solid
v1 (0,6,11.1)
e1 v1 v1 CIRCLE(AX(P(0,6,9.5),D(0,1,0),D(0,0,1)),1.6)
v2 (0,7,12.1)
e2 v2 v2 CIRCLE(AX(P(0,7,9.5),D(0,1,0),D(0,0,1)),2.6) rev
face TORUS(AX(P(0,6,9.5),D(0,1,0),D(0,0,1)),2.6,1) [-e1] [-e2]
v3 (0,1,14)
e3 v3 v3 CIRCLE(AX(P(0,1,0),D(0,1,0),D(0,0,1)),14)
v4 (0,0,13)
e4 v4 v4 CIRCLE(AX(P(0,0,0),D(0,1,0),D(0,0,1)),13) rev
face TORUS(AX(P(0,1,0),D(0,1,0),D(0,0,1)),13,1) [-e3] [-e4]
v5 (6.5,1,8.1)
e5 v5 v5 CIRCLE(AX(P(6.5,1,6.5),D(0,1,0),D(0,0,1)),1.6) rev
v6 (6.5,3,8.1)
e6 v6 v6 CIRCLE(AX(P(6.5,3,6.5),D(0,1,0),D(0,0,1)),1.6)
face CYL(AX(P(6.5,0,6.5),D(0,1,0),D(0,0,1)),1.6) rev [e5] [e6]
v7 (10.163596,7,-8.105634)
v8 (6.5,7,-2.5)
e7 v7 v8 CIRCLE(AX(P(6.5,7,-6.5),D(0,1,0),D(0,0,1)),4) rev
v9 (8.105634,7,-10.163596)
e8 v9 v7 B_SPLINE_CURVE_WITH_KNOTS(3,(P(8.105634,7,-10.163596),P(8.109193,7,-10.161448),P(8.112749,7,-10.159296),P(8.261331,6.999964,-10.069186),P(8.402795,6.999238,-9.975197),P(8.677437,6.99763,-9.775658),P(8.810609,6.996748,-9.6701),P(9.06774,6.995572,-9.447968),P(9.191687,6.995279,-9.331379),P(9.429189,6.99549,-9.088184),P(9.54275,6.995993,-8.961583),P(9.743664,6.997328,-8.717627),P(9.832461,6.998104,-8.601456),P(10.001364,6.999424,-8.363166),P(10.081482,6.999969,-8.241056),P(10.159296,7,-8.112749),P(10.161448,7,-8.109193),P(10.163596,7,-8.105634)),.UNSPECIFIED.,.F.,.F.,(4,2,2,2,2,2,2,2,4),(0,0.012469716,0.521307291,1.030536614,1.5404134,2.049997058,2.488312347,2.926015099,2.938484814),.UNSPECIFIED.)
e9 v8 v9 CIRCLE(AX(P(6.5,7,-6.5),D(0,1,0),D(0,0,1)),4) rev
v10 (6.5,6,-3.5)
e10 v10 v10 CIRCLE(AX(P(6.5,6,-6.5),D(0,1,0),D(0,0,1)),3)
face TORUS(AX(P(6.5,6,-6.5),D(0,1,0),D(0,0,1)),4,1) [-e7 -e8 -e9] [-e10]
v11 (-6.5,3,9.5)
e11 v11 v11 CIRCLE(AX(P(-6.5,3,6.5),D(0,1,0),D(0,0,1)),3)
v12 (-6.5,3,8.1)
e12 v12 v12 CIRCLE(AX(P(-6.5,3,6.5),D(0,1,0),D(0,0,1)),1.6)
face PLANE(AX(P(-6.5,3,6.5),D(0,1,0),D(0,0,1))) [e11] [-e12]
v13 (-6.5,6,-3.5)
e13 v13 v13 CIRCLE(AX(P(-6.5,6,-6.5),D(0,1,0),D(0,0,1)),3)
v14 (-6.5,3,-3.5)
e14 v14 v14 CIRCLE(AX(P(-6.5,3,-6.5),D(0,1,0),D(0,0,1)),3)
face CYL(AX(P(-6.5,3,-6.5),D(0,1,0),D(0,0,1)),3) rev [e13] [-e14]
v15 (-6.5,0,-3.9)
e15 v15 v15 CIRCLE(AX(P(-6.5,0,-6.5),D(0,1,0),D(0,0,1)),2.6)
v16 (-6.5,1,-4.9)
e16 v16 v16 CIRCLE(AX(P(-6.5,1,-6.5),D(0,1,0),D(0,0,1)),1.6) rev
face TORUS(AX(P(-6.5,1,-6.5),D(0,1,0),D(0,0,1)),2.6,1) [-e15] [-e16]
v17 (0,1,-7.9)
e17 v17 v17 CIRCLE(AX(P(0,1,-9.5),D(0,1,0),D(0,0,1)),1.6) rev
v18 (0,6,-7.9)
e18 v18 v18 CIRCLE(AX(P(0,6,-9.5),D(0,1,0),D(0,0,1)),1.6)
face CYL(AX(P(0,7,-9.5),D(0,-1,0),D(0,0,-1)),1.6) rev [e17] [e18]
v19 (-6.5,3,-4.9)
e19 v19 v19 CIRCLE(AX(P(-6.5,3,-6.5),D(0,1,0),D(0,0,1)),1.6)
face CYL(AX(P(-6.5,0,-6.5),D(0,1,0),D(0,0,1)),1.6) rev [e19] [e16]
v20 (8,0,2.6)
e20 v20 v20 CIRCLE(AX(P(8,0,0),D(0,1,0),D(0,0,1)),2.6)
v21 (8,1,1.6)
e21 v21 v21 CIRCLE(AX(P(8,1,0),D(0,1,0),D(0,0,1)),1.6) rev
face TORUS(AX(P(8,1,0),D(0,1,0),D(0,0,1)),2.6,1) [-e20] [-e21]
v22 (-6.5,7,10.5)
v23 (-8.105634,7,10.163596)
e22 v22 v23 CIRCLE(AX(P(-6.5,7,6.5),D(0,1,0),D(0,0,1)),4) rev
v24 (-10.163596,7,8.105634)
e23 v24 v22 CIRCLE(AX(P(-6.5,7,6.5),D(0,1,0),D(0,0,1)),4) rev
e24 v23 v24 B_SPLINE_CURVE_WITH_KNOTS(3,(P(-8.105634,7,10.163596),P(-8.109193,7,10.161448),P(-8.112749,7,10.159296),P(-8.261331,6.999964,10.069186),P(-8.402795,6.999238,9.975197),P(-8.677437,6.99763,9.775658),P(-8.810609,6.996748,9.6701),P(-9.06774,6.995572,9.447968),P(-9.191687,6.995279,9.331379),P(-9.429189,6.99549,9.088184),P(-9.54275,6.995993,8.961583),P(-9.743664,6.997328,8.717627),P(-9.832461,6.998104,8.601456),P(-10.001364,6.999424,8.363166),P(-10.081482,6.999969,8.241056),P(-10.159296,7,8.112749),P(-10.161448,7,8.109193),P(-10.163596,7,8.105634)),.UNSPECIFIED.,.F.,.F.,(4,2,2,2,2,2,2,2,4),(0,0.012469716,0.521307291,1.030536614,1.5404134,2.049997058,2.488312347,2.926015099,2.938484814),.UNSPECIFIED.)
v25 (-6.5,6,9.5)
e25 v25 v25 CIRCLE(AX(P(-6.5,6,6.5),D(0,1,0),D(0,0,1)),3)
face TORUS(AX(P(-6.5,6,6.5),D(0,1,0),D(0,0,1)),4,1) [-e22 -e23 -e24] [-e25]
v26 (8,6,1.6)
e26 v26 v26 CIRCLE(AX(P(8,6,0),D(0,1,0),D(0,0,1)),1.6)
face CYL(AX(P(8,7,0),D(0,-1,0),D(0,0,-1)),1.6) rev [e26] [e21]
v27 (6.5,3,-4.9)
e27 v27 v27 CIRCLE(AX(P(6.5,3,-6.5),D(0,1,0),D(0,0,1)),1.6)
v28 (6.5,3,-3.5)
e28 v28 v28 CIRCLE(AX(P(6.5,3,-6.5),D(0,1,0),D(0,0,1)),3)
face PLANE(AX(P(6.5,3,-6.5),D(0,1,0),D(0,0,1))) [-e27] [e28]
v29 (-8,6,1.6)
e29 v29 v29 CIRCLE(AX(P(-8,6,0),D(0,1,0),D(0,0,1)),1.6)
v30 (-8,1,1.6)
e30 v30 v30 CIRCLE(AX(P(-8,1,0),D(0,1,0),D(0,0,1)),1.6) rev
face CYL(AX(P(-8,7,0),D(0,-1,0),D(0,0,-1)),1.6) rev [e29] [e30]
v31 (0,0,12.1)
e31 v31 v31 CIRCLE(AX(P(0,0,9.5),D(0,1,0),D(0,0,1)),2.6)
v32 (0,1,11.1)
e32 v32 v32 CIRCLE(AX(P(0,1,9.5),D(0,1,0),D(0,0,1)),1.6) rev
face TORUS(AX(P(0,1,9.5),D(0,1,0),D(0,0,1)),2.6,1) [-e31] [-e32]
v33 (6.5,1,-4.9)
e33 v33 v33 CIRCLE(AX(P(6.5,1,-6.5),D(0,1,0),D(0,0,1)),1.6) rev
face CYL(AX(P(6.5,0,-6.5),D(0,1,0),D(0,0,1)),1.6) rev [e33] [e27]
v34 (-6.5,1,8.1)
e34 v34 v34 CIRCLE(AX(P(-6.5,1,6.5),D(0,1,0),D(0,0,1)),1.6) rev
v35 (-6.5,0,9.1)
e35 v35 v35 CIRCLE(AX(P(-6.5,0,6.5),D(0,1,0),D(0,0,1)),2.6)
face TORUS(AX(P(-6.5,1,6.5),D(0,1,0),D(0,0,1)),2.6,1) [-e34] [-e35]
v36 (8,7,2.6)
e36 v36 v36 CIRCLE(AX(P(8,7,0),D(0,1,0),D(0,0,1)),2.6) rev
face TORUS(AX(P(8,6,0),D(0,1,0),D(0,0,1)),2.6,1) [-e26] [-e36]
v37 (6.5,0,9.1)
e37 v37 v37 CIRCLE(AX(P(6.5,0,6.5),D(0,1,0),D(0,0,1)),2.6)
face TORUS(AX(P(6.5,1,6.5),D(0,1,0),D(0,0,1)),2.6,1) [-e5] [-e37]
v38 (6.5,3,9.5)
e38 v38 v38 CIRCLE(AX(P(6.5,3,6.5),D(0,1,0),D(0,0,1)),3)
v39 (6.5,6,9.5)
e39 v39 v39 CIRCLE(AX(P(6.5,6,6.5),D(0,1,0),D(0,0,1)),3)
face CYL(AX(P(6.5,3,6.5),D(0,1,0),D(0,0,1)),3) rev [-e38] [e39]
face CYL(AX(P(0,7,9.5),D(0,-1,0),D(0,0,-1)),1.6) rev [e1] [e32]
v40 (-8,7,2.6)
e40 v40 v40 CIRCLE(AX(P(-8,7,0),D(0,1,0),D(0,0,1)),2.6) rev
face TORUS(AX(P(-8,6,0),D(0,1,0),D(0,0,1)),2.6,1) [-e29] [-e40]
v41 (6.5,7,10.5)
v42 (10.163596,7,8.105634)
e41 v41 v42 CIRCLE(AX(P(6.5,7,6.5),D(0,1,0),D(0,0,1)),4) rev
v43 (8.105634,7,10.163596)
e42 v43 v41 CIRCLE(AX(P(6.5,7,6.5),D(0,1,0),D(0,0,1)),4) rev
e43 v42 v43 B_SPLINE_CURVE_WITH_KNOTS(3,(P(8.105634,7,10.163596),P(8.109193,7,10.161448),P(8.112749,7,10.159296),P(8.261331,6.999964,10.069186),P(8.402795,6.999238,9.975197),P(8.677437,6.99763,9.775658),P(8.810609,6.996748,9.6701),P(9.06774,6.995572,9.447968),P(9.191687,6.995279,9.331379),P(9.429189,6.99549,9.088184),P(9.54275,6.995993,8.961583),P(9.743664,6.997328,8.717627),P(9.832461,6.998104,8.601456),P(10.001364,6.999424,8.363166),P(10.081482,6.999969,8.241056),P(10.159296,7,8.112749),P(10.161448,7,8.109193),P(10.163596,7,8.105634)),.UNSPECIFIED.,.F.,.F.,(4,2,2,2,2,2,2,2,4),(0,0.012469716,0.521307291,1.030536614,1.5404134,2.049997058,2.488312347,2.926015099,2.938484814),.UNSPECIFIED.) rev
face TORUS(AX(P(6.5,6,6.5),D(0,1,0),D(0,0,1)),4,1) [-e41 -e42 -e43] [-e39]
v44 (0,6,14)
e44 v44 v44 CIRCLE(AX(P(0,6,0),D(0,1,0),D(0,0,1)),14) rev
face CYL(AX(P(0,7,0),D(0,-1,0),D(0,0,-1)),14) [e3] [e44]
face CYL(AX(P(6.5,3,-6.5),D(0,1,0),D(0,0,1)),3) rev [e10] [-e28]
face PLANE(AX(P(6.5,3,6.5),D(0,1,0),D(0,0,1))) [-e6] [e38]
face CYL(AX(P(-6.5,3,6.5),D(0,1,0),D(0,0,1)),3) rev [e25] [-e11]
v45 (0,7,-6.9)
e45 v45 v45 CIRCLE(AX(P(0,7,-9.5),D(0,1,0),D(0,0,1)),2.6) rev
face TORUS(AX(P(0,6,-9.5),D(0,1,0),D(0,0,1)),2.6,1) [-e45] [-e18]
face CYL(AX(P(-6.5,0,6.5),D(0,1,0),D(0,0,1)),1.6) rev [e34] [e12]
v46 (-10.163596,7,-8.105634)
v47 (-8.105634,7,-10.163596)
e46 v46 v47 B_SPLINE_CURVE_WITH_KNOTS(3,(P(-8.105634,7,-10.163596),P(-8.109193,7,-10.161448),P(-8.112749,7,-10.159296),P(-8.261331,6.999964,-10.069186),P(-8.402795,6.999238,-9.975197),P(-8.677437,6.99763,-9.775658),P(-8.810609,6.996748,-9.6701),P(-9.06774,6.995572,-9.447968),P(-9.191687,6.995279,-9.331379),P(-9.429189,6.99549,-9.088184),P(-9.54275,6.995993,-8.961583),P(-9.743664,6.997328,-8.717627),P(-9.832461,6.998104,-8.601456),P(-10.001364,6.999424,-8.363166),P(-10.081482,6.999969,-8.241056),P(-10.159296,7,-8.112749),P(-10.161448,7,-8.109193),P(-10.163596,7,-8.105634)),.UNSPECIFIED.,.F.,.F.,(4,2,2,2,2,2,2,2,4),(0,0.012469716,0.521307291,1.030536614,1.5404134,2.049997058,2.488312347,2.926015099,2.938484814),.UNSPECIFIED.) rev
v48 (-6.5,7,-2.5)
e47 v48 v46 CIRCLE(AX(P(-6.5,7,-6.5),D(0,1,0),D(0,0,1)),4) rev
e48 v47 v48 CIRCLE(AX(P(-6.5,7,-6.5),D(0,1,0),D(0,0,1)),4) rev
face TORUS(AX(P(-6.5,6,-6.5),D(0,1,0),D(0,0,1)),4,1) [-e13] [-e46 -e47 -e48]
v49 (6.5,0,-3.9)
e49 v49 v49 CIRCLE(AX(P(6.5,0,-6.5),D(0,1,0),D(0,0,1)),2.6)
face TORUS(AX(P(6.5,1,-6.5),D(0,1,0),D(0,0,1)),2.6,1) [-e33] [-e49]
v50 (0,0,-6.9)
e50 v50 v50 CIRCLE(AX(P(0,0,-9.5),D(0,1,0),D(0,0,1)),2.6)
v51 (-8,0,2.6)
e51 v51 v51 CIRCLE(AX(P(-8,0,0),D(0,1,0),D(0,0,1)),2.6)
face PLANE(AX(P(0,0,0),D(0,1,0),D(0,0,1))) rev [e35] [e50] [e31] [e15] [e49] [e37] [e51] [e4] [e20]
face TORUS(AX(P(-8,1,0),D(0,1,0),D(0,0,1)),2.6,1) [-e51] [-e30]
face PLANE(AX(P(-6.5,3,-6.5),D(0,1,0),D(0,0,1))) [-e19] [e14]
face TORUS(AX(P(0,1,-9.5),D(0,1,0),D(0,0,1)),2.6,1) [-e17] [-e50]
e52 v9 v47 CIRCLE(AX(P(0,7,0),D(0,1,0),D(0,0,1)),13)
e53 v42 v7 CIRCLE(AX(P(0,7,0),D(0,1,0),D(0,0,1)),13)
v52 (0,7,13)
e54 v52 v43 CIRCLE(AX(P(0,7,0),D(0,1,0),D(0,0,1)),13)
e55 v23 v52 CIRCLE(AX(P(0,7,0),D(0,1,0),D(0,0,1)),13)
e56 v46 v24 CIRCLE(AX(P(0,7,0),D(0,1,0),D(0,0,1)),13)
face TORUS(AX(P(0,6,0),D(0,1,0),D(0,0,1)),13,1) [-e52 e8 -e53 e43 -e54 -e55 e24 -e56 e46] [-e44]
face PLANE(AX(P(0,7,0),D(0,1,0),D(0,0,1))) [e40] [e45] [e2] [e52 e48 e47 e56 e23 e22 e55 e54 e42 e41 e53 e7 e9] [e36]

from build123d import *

# Parameters (mm, degrees)
SKETCH_1_R          = 14
SKETCH_1_R_2        = 1.6
EXTRUDE_1_DEPTH     = 7
SKETCH_2_R          = 3
CUT_EXTRUDE_1_DEPTH = 4
SKETCH_3_R          = 1.6
CUT_EXTRUDE_2_DEPTH = 22
FILLET_1_R          = 1


with BuildPart() as part:
    # 草图1 → 凸台-拉伸1 (new body)
    with BuildSketch(Plane(origin=(0, 0, 0), x_dir=(1, 0, 0), z_dir=(0, 1, 0))):
        with Locations(Location((0, 0, 0), (0, 0, 270))):
            Circle(SKETCH_1_R)
        with Locations(Location((0, 9.5, 0), (0, 0, 270))):
            Circle(SKETCH_1_R_2, mode=Mode.SUBTRACT)
        with Locations(Location((8, 0, 0), (0, 0, 270))):
            Circle(SKETCH_1_R_2, mode=Mode.SUBTRACT)
        with Locations(Location((-8, 0, 0), (0, 0, 270))):
            Circle(SKETCH_1_R_2, mode=Mode.SUBTRACT)
        with Locations(Location((0, -9.5, 0), (0, 0, 270))):
            Circle(SKETCH_1_R_2, mode=Mode.SUBTRACT)
    extrude(amount=EXTRUDE_1_DEPTH)

    # 草图2 → 切除-拉伸1 (cut)
    with BuildSketch(Plane(origin=(0, 7, 0), x_dir=(1, 0, 0), z_dir=(0, 1, 0))):
        with Locations(Location((6.5, 6.5, 0), (0, 0, 270))):
            Circle(SKETCH_2_R)
        with Locations(Location((6.5, -6.5, 0), (0, 0, 270))):
            Circle(SKETCH_2_R)
        with Locations(Location((-6.5, -6.5, 0), (0, 0, 270))):
            Circle(SKETCH_2_R)
        with Locations(Location((-6.5, 6.5, 0), (0, 0, 270))):
            Circle(SKETCH_2_R)
    extrude(amount=-CUT_EXTRUDE_1_DEPTH, mode=Mode.SUBTRACT)

    # 草图3 → 切除-拉伸2 (cut, through all)
    with BuildSketch(Plane(origin=(0, 7, 0), x_dir=(1, 0, 0), z_dir=(0, 1, 0))):
        with Locations(Location((-6.5, 6.5, 0), (0, 0, 270))):
            Circle(SKETCH_3_R)
        with Locations(Location((6.5, 6.5, 0), (0, 0, 270))):
            Circle(SKETCH_3_R)
        with Locations(Location((6.5, -6.5, 0), (0, 0, 270))):
            Circle(SKETCH_3_R)
        with Locations(Location((-6.5, -6.5, 0), (0, 0, 270))):
            Circle(SKETCH_3_R)
    extrude(amount=-CUT_EXTRUDE_2_DEPTH, mode=Mode.SUBTRACT)

    # 圆角1
    # the kernel refuses this fillet: 1 mm, written as the material it takes off along each edge
    with BuildSketch(Plane(origin=(-8, 0, 0), x_dir=(0, 0, 1), z_dir=(-1, 0, 0))) as fillet_1_piece_1:
        with BuildLine():
            CenterArc((1.6 + FILLET_1_R, FILLET_1_R), FILLET_1_R, 180, 90)
            Line((1.6, FILLET_1_R), (1.6, 0))
            Line((1.6, 0), (1.6 + FILLET_1_R, 0))
        make_face()
    revolve(axis=Axis((-8, 0, 0), (0, 1, 0)), mode=Mode.SUBTRACT)
    with BuildSketch(Plane(origin=(-8, 7, 0), x_dir=(0, 0, 1), z_dir=(-1, 0, 0))) as fillet_1_piece_2:
        with BuildLine():
            CenterArc((1.6 + FILLET_1_R, -FILLET_1_R), FILLET_1_R, 90, 90)
            Line((1.6, -FILLET_1_R), (1.6, 0))
            Line((1.6, 0), (1.6 + FILLET_1_R, 0))
        make_face()
    revolve(axis=Axis((-8, 7, 0), (0, 1, 0)), mode=Mode.SUBTRACT)
    with BuildSketch(Plane(origin=(0, 0, 9.5), x_dir=(0, 0, 1), z_dir=(-1, 0, 0))) as fillet_1_piece_3:
        with BuildLine():
            CenterArc((1.6 + FILLET_1_R, FILLET_1_R), FILLET_1_R, 180, 90)
            Line((1.6, FILLET_1_R), (1.6, 0))
            Line((1.6, 0), (1.6 + FILLET_1_R, 0))
        make_face()
    revolve(axis=Axis((0, 0, 9.5), (0, 1, 0)), mode=Mode.SUBTRACT)
    with BuildSketch(Plane(origin=(0, 7, 9.5), x_dir=(0, 0, 1), z_dir=(-1, 0, 0))) as fillet_1_piece_4:
        with BuildLine():
            CenterArc((1.6 + FILLET_1_R, -FILLET_1_R), FILLET_1_R, 90, 90)
            Line((1.6, -FILLET_1_R), (1.6, 0))
            Line((1.6, 0), (1.6 + FILLET_1_R, 0))
        make_face()
    revolve(axis=Axis((0, 7, 9.5), (0, 1, 0)), mode=Mode.SUBTRACT)
    with BuildSketch(Plane(origin=(0, 0, 0), x_dir=(0, 0, 1), z_dir=(-1, 0, 0))) as fillet_1_piece_5:
        with BuildLine():
            CenterArc((14 - FILLET_1_R, FILLET_1_R), FILLET_1_R, 270, 90)
            Line((14 - FILLET_1_R, 0), (14, 0))
            Line((14, 0), (14, FILLET_1_R))
        make_face()
    revolve(axis=Axis((0, 0, 0), (0, 1, 0)), mode=Mode.SUBTRACT)
    with BuildSketch(Plane(origin=(-6.5, 7, -6.5), x_dir=(0, 0, 1), z_dir=(-1, 0, 0))) as fillet_1_piece_6:
        with BuildLine():
            CenterArc((3 + FILLET_1_R, -FILLET_1_R), FILLET_1_R, 90, 90)
            Line((3, -FILLET_1_R), (3, 0))
            Line((3, 0), (3 + FILLET_1_R, 0))
        make_face()
    revolve(axis=Axis((-6.5, 7, -6.5), (0, 1, 0)), mode=Mode.SUBTRACT)
    with BuildSketch(Plane(origin=(-6.5, 7, 6.5), x_dir=(0, 0, 1), z_dir=(-1, 0, 0))) as fillet_1_piece_7:
        with BuildLine():
            CenterArc((3 + FILLET_1_R, -FILLET_1_R), FILLET_1_R, 90, 90)
            Line((3, -FILLET_1_R), (3, 0))
            Line((3, 0), (3 + FILLET_1_R, 0))
        make_face()
    revolve(axis=Axis((-6.5, 7, 6.5), (0, 1, 0)), mode=Mode.SUBTRACT)
    with BuildSketch(Plane(origin=(6.5, 7, 6.5), x_dir=(0, 0, 1), z_dir=(-1, 0, 0))) as fillet_1_piece_8:
        with BuildLine():
            CenterArc((3 + FILLET_1_R, -FILLET_1_R), FILLET_1_R, 90, 90)
            Line((3, -FILLET_1_R), (3, 0))
            Line((3, 0), (3 + FILLET_1_R, 0))
        make_face()
    revolve(axis=Axis((6.5, 7, 6.5), (0, 1, 0)), mode=Mode.SUBTRACT)
    with BuildSketch(Plane(origin=(6.5, 7, -6.5), x_dir=(0, 0, 1), z_dir=(-1, 0, 0))) as fillet_1_piece_9:
        with BuildLine():
            CenterArc((3 + FILLET_1_R, -FILLET_1_R), FILLET_1_R, 90, 90)
            Line((3, -FILLET_1_R), (3, 0))
            Line((3, 0), (3 + FILLET_1_R, 0))
        make_face()
    revolve(axis=Axis((6.5, 7, -6.5), (0, 1, 0)), mode=Mode.SUBTRACT)
    with BuildSketch(Plane(origin=(-6.5, 0, 6.5), x_dir=(0, 0, 1), z_dir=(-1, 0, 0))) as fillet_1_piece_10:
        with BuildLine():
            CenterArc((1.6 + FILLET_1_R, FILLET_1_R), FILLET_1_R, 180, 90)
            Line((1.6, FILLET_1_R), (1.6, 0))
            Line((1.6, 0), (1.6 + FILLET_1_R, 0))
        make_face()
    revolve(axis=Axis((-6.5, 0, 6.5), (0, 1, 0)), mode=Mode.SUBTRACT)
    with BuildSketch(Plane(origin=(6.5, 0, 6.5), x_dir=(0, 0, 1), z_dir=(-1, 0, 0))) as fillet_1_piece_11:
        with BuildLine():
            CenterArc((1.6 + FILLET_1_R, FILLET_1_R), FILLET_1_R, 180, 90)
            Line((1.6, FILLET_1_R), (1.6, 0))
            Line((1.6, 0), (1.6 + FILLET_1_R, 0))
        make_face()
    revolve(axis=Axis((6.5, 0, 6.5), (0, 1, 0)), mode=Mode.SUBTRACT)
    with BuildSketch(Plane(origin=(6.5, 0, -6.5), x_dir=(0, 0, 1), z_dir=(-1, 0, 0))) as fillet_1_piece_12:
        with BuildLine():
            CenterArc((1.6 + FILLET_1_R, FILLET_1_R), FILLET_1_R, 180, 90)
            Line((1.6, FILLET_1_R), (1.6, 0))
            Line((1.6, 0), (1.6 + FILLET_1_R, 0))
        make_face()
    revolve(axis=Axis((6.5, 0, -6.5), (0, 1, 0)), mode=Mode.SUBTRACT)
    with BuildSketch(Plane(origin=(0, 7, 0), x_dir=(0, 0, 1), z_dir=(-1, 0, 0))) as fillet_1_piece_13:
        with BuildLine():
            CenterArc((14 - FILLET_1_R, -FILLET_1_R), FILLET_1_R, 0, 90)
            Line((14 - FILLET_1_R, 0), (14, 0))
            Line((14, 0), (14, -FILLET_1_R))
        make_face()
    revolve(axis=Axis((0, 7, 0), (0, 1, 0)), mode=Mode.SUBTRACT)
    with BuildSketch(Plane(origin=(-6.5, 0, -6.5), x_dir=(0, 0, 1), z_dir=(-1, 0, 0))) as fillet_1_piece_14:
        with BuildLine():
            CenterArc((1.6 + FILLET_1_R, FILLET_1_R), FILLET_1_R, 180, 90)
            Line((1.6, FILLET_1_R), (1.6, 0))
            Line((1.6, 0), (1.6 + FILLET_1_R, 0))
        make_face()
    revolve(axis=Axis((-6.5, 0, -6.5), (0, 1, 0)), mode=Mode.SUBTRACT)
    with BuildSketch(Plane(origin=(0, 0, -9.5), x_dir=(0, 0, 1), z_dir=(-1, 0, 0))) as fillet_1_piece_15:
        with BuildLine():
            CenterArc((1.6 + FILLET_1_R, FILLET_1_R), FILLET_1_R, 180, 90)
            Line((1.6, FILLET_1_R), (1.6, 0))
            Line((1.6, 0), (1.6 + FILLET_1_R, 0))
        make_face()
    revolve(axis=Axis((0, 0, -9.5), (0, 1, 0)), mode=Mode.SUBTRACT)
    with BuildSketch(Plane(origin=(0, 7, -9.5), x_dir=(0, 0, 1), z_dir=(-1, 0, 0))) as fillet_1_piece_16:
        with BuildLine():
            CenterArc((1.6 + FILLET_1_R, -FILLET_1_R), FILLET_1_R, 90, 90)
            Line((1.6, -FILLET_1_R), (1.6, 0))
            Line((1.6, 0), (1.6 + FILLET_1_R, 0))
        make_face()
    revolve(axis=Axis((0, 7, -9.5), (0, 1, 0)), mode=Mode.SUBTRACT)
    with BuildSketch(Plane(origin=(8, 0, 0), x_dir=(0, 0, 1), z_dir=(-1, 0, 0))) as fillet_1_piece_17:
        with BuildLine():
            CenterArc((1.6 + FILLET_1_R, FILLET_1_R), FILLET_1_R, 180, 90)
            Line((1.6, FILLET_1_R), (1.6, 0))
            Line((1.6, 0), (1.6 + FILLET_1_R, 0))
        make_face()
    revolve(axis=Axis((8, 0, 0), (0, 1, 0)), mode=Mode.SUBTRACT)
    with BuildSketch(Plane(origin=(8, 7, 0), x_dir=(0, 0, 1), z_dir=(-1, 0, 0))) as fillet_1_piece_18:
        with BuildLine():
            CenterArc((1.6 + FILLET_1_R, -FILLET_1_R), FILLET_1_R, 90, 90)
            Line((1.6, -FILLET_1_R), (1.6, 0))
            Line((1.6, 0), (1.6 + FILLET_1_R, 0))
        make_face()
    revolve(axis=Axis((8, 7, 0), (0, 1, 0)), mode=Mode.SUBTRACT)


solid = part.part
